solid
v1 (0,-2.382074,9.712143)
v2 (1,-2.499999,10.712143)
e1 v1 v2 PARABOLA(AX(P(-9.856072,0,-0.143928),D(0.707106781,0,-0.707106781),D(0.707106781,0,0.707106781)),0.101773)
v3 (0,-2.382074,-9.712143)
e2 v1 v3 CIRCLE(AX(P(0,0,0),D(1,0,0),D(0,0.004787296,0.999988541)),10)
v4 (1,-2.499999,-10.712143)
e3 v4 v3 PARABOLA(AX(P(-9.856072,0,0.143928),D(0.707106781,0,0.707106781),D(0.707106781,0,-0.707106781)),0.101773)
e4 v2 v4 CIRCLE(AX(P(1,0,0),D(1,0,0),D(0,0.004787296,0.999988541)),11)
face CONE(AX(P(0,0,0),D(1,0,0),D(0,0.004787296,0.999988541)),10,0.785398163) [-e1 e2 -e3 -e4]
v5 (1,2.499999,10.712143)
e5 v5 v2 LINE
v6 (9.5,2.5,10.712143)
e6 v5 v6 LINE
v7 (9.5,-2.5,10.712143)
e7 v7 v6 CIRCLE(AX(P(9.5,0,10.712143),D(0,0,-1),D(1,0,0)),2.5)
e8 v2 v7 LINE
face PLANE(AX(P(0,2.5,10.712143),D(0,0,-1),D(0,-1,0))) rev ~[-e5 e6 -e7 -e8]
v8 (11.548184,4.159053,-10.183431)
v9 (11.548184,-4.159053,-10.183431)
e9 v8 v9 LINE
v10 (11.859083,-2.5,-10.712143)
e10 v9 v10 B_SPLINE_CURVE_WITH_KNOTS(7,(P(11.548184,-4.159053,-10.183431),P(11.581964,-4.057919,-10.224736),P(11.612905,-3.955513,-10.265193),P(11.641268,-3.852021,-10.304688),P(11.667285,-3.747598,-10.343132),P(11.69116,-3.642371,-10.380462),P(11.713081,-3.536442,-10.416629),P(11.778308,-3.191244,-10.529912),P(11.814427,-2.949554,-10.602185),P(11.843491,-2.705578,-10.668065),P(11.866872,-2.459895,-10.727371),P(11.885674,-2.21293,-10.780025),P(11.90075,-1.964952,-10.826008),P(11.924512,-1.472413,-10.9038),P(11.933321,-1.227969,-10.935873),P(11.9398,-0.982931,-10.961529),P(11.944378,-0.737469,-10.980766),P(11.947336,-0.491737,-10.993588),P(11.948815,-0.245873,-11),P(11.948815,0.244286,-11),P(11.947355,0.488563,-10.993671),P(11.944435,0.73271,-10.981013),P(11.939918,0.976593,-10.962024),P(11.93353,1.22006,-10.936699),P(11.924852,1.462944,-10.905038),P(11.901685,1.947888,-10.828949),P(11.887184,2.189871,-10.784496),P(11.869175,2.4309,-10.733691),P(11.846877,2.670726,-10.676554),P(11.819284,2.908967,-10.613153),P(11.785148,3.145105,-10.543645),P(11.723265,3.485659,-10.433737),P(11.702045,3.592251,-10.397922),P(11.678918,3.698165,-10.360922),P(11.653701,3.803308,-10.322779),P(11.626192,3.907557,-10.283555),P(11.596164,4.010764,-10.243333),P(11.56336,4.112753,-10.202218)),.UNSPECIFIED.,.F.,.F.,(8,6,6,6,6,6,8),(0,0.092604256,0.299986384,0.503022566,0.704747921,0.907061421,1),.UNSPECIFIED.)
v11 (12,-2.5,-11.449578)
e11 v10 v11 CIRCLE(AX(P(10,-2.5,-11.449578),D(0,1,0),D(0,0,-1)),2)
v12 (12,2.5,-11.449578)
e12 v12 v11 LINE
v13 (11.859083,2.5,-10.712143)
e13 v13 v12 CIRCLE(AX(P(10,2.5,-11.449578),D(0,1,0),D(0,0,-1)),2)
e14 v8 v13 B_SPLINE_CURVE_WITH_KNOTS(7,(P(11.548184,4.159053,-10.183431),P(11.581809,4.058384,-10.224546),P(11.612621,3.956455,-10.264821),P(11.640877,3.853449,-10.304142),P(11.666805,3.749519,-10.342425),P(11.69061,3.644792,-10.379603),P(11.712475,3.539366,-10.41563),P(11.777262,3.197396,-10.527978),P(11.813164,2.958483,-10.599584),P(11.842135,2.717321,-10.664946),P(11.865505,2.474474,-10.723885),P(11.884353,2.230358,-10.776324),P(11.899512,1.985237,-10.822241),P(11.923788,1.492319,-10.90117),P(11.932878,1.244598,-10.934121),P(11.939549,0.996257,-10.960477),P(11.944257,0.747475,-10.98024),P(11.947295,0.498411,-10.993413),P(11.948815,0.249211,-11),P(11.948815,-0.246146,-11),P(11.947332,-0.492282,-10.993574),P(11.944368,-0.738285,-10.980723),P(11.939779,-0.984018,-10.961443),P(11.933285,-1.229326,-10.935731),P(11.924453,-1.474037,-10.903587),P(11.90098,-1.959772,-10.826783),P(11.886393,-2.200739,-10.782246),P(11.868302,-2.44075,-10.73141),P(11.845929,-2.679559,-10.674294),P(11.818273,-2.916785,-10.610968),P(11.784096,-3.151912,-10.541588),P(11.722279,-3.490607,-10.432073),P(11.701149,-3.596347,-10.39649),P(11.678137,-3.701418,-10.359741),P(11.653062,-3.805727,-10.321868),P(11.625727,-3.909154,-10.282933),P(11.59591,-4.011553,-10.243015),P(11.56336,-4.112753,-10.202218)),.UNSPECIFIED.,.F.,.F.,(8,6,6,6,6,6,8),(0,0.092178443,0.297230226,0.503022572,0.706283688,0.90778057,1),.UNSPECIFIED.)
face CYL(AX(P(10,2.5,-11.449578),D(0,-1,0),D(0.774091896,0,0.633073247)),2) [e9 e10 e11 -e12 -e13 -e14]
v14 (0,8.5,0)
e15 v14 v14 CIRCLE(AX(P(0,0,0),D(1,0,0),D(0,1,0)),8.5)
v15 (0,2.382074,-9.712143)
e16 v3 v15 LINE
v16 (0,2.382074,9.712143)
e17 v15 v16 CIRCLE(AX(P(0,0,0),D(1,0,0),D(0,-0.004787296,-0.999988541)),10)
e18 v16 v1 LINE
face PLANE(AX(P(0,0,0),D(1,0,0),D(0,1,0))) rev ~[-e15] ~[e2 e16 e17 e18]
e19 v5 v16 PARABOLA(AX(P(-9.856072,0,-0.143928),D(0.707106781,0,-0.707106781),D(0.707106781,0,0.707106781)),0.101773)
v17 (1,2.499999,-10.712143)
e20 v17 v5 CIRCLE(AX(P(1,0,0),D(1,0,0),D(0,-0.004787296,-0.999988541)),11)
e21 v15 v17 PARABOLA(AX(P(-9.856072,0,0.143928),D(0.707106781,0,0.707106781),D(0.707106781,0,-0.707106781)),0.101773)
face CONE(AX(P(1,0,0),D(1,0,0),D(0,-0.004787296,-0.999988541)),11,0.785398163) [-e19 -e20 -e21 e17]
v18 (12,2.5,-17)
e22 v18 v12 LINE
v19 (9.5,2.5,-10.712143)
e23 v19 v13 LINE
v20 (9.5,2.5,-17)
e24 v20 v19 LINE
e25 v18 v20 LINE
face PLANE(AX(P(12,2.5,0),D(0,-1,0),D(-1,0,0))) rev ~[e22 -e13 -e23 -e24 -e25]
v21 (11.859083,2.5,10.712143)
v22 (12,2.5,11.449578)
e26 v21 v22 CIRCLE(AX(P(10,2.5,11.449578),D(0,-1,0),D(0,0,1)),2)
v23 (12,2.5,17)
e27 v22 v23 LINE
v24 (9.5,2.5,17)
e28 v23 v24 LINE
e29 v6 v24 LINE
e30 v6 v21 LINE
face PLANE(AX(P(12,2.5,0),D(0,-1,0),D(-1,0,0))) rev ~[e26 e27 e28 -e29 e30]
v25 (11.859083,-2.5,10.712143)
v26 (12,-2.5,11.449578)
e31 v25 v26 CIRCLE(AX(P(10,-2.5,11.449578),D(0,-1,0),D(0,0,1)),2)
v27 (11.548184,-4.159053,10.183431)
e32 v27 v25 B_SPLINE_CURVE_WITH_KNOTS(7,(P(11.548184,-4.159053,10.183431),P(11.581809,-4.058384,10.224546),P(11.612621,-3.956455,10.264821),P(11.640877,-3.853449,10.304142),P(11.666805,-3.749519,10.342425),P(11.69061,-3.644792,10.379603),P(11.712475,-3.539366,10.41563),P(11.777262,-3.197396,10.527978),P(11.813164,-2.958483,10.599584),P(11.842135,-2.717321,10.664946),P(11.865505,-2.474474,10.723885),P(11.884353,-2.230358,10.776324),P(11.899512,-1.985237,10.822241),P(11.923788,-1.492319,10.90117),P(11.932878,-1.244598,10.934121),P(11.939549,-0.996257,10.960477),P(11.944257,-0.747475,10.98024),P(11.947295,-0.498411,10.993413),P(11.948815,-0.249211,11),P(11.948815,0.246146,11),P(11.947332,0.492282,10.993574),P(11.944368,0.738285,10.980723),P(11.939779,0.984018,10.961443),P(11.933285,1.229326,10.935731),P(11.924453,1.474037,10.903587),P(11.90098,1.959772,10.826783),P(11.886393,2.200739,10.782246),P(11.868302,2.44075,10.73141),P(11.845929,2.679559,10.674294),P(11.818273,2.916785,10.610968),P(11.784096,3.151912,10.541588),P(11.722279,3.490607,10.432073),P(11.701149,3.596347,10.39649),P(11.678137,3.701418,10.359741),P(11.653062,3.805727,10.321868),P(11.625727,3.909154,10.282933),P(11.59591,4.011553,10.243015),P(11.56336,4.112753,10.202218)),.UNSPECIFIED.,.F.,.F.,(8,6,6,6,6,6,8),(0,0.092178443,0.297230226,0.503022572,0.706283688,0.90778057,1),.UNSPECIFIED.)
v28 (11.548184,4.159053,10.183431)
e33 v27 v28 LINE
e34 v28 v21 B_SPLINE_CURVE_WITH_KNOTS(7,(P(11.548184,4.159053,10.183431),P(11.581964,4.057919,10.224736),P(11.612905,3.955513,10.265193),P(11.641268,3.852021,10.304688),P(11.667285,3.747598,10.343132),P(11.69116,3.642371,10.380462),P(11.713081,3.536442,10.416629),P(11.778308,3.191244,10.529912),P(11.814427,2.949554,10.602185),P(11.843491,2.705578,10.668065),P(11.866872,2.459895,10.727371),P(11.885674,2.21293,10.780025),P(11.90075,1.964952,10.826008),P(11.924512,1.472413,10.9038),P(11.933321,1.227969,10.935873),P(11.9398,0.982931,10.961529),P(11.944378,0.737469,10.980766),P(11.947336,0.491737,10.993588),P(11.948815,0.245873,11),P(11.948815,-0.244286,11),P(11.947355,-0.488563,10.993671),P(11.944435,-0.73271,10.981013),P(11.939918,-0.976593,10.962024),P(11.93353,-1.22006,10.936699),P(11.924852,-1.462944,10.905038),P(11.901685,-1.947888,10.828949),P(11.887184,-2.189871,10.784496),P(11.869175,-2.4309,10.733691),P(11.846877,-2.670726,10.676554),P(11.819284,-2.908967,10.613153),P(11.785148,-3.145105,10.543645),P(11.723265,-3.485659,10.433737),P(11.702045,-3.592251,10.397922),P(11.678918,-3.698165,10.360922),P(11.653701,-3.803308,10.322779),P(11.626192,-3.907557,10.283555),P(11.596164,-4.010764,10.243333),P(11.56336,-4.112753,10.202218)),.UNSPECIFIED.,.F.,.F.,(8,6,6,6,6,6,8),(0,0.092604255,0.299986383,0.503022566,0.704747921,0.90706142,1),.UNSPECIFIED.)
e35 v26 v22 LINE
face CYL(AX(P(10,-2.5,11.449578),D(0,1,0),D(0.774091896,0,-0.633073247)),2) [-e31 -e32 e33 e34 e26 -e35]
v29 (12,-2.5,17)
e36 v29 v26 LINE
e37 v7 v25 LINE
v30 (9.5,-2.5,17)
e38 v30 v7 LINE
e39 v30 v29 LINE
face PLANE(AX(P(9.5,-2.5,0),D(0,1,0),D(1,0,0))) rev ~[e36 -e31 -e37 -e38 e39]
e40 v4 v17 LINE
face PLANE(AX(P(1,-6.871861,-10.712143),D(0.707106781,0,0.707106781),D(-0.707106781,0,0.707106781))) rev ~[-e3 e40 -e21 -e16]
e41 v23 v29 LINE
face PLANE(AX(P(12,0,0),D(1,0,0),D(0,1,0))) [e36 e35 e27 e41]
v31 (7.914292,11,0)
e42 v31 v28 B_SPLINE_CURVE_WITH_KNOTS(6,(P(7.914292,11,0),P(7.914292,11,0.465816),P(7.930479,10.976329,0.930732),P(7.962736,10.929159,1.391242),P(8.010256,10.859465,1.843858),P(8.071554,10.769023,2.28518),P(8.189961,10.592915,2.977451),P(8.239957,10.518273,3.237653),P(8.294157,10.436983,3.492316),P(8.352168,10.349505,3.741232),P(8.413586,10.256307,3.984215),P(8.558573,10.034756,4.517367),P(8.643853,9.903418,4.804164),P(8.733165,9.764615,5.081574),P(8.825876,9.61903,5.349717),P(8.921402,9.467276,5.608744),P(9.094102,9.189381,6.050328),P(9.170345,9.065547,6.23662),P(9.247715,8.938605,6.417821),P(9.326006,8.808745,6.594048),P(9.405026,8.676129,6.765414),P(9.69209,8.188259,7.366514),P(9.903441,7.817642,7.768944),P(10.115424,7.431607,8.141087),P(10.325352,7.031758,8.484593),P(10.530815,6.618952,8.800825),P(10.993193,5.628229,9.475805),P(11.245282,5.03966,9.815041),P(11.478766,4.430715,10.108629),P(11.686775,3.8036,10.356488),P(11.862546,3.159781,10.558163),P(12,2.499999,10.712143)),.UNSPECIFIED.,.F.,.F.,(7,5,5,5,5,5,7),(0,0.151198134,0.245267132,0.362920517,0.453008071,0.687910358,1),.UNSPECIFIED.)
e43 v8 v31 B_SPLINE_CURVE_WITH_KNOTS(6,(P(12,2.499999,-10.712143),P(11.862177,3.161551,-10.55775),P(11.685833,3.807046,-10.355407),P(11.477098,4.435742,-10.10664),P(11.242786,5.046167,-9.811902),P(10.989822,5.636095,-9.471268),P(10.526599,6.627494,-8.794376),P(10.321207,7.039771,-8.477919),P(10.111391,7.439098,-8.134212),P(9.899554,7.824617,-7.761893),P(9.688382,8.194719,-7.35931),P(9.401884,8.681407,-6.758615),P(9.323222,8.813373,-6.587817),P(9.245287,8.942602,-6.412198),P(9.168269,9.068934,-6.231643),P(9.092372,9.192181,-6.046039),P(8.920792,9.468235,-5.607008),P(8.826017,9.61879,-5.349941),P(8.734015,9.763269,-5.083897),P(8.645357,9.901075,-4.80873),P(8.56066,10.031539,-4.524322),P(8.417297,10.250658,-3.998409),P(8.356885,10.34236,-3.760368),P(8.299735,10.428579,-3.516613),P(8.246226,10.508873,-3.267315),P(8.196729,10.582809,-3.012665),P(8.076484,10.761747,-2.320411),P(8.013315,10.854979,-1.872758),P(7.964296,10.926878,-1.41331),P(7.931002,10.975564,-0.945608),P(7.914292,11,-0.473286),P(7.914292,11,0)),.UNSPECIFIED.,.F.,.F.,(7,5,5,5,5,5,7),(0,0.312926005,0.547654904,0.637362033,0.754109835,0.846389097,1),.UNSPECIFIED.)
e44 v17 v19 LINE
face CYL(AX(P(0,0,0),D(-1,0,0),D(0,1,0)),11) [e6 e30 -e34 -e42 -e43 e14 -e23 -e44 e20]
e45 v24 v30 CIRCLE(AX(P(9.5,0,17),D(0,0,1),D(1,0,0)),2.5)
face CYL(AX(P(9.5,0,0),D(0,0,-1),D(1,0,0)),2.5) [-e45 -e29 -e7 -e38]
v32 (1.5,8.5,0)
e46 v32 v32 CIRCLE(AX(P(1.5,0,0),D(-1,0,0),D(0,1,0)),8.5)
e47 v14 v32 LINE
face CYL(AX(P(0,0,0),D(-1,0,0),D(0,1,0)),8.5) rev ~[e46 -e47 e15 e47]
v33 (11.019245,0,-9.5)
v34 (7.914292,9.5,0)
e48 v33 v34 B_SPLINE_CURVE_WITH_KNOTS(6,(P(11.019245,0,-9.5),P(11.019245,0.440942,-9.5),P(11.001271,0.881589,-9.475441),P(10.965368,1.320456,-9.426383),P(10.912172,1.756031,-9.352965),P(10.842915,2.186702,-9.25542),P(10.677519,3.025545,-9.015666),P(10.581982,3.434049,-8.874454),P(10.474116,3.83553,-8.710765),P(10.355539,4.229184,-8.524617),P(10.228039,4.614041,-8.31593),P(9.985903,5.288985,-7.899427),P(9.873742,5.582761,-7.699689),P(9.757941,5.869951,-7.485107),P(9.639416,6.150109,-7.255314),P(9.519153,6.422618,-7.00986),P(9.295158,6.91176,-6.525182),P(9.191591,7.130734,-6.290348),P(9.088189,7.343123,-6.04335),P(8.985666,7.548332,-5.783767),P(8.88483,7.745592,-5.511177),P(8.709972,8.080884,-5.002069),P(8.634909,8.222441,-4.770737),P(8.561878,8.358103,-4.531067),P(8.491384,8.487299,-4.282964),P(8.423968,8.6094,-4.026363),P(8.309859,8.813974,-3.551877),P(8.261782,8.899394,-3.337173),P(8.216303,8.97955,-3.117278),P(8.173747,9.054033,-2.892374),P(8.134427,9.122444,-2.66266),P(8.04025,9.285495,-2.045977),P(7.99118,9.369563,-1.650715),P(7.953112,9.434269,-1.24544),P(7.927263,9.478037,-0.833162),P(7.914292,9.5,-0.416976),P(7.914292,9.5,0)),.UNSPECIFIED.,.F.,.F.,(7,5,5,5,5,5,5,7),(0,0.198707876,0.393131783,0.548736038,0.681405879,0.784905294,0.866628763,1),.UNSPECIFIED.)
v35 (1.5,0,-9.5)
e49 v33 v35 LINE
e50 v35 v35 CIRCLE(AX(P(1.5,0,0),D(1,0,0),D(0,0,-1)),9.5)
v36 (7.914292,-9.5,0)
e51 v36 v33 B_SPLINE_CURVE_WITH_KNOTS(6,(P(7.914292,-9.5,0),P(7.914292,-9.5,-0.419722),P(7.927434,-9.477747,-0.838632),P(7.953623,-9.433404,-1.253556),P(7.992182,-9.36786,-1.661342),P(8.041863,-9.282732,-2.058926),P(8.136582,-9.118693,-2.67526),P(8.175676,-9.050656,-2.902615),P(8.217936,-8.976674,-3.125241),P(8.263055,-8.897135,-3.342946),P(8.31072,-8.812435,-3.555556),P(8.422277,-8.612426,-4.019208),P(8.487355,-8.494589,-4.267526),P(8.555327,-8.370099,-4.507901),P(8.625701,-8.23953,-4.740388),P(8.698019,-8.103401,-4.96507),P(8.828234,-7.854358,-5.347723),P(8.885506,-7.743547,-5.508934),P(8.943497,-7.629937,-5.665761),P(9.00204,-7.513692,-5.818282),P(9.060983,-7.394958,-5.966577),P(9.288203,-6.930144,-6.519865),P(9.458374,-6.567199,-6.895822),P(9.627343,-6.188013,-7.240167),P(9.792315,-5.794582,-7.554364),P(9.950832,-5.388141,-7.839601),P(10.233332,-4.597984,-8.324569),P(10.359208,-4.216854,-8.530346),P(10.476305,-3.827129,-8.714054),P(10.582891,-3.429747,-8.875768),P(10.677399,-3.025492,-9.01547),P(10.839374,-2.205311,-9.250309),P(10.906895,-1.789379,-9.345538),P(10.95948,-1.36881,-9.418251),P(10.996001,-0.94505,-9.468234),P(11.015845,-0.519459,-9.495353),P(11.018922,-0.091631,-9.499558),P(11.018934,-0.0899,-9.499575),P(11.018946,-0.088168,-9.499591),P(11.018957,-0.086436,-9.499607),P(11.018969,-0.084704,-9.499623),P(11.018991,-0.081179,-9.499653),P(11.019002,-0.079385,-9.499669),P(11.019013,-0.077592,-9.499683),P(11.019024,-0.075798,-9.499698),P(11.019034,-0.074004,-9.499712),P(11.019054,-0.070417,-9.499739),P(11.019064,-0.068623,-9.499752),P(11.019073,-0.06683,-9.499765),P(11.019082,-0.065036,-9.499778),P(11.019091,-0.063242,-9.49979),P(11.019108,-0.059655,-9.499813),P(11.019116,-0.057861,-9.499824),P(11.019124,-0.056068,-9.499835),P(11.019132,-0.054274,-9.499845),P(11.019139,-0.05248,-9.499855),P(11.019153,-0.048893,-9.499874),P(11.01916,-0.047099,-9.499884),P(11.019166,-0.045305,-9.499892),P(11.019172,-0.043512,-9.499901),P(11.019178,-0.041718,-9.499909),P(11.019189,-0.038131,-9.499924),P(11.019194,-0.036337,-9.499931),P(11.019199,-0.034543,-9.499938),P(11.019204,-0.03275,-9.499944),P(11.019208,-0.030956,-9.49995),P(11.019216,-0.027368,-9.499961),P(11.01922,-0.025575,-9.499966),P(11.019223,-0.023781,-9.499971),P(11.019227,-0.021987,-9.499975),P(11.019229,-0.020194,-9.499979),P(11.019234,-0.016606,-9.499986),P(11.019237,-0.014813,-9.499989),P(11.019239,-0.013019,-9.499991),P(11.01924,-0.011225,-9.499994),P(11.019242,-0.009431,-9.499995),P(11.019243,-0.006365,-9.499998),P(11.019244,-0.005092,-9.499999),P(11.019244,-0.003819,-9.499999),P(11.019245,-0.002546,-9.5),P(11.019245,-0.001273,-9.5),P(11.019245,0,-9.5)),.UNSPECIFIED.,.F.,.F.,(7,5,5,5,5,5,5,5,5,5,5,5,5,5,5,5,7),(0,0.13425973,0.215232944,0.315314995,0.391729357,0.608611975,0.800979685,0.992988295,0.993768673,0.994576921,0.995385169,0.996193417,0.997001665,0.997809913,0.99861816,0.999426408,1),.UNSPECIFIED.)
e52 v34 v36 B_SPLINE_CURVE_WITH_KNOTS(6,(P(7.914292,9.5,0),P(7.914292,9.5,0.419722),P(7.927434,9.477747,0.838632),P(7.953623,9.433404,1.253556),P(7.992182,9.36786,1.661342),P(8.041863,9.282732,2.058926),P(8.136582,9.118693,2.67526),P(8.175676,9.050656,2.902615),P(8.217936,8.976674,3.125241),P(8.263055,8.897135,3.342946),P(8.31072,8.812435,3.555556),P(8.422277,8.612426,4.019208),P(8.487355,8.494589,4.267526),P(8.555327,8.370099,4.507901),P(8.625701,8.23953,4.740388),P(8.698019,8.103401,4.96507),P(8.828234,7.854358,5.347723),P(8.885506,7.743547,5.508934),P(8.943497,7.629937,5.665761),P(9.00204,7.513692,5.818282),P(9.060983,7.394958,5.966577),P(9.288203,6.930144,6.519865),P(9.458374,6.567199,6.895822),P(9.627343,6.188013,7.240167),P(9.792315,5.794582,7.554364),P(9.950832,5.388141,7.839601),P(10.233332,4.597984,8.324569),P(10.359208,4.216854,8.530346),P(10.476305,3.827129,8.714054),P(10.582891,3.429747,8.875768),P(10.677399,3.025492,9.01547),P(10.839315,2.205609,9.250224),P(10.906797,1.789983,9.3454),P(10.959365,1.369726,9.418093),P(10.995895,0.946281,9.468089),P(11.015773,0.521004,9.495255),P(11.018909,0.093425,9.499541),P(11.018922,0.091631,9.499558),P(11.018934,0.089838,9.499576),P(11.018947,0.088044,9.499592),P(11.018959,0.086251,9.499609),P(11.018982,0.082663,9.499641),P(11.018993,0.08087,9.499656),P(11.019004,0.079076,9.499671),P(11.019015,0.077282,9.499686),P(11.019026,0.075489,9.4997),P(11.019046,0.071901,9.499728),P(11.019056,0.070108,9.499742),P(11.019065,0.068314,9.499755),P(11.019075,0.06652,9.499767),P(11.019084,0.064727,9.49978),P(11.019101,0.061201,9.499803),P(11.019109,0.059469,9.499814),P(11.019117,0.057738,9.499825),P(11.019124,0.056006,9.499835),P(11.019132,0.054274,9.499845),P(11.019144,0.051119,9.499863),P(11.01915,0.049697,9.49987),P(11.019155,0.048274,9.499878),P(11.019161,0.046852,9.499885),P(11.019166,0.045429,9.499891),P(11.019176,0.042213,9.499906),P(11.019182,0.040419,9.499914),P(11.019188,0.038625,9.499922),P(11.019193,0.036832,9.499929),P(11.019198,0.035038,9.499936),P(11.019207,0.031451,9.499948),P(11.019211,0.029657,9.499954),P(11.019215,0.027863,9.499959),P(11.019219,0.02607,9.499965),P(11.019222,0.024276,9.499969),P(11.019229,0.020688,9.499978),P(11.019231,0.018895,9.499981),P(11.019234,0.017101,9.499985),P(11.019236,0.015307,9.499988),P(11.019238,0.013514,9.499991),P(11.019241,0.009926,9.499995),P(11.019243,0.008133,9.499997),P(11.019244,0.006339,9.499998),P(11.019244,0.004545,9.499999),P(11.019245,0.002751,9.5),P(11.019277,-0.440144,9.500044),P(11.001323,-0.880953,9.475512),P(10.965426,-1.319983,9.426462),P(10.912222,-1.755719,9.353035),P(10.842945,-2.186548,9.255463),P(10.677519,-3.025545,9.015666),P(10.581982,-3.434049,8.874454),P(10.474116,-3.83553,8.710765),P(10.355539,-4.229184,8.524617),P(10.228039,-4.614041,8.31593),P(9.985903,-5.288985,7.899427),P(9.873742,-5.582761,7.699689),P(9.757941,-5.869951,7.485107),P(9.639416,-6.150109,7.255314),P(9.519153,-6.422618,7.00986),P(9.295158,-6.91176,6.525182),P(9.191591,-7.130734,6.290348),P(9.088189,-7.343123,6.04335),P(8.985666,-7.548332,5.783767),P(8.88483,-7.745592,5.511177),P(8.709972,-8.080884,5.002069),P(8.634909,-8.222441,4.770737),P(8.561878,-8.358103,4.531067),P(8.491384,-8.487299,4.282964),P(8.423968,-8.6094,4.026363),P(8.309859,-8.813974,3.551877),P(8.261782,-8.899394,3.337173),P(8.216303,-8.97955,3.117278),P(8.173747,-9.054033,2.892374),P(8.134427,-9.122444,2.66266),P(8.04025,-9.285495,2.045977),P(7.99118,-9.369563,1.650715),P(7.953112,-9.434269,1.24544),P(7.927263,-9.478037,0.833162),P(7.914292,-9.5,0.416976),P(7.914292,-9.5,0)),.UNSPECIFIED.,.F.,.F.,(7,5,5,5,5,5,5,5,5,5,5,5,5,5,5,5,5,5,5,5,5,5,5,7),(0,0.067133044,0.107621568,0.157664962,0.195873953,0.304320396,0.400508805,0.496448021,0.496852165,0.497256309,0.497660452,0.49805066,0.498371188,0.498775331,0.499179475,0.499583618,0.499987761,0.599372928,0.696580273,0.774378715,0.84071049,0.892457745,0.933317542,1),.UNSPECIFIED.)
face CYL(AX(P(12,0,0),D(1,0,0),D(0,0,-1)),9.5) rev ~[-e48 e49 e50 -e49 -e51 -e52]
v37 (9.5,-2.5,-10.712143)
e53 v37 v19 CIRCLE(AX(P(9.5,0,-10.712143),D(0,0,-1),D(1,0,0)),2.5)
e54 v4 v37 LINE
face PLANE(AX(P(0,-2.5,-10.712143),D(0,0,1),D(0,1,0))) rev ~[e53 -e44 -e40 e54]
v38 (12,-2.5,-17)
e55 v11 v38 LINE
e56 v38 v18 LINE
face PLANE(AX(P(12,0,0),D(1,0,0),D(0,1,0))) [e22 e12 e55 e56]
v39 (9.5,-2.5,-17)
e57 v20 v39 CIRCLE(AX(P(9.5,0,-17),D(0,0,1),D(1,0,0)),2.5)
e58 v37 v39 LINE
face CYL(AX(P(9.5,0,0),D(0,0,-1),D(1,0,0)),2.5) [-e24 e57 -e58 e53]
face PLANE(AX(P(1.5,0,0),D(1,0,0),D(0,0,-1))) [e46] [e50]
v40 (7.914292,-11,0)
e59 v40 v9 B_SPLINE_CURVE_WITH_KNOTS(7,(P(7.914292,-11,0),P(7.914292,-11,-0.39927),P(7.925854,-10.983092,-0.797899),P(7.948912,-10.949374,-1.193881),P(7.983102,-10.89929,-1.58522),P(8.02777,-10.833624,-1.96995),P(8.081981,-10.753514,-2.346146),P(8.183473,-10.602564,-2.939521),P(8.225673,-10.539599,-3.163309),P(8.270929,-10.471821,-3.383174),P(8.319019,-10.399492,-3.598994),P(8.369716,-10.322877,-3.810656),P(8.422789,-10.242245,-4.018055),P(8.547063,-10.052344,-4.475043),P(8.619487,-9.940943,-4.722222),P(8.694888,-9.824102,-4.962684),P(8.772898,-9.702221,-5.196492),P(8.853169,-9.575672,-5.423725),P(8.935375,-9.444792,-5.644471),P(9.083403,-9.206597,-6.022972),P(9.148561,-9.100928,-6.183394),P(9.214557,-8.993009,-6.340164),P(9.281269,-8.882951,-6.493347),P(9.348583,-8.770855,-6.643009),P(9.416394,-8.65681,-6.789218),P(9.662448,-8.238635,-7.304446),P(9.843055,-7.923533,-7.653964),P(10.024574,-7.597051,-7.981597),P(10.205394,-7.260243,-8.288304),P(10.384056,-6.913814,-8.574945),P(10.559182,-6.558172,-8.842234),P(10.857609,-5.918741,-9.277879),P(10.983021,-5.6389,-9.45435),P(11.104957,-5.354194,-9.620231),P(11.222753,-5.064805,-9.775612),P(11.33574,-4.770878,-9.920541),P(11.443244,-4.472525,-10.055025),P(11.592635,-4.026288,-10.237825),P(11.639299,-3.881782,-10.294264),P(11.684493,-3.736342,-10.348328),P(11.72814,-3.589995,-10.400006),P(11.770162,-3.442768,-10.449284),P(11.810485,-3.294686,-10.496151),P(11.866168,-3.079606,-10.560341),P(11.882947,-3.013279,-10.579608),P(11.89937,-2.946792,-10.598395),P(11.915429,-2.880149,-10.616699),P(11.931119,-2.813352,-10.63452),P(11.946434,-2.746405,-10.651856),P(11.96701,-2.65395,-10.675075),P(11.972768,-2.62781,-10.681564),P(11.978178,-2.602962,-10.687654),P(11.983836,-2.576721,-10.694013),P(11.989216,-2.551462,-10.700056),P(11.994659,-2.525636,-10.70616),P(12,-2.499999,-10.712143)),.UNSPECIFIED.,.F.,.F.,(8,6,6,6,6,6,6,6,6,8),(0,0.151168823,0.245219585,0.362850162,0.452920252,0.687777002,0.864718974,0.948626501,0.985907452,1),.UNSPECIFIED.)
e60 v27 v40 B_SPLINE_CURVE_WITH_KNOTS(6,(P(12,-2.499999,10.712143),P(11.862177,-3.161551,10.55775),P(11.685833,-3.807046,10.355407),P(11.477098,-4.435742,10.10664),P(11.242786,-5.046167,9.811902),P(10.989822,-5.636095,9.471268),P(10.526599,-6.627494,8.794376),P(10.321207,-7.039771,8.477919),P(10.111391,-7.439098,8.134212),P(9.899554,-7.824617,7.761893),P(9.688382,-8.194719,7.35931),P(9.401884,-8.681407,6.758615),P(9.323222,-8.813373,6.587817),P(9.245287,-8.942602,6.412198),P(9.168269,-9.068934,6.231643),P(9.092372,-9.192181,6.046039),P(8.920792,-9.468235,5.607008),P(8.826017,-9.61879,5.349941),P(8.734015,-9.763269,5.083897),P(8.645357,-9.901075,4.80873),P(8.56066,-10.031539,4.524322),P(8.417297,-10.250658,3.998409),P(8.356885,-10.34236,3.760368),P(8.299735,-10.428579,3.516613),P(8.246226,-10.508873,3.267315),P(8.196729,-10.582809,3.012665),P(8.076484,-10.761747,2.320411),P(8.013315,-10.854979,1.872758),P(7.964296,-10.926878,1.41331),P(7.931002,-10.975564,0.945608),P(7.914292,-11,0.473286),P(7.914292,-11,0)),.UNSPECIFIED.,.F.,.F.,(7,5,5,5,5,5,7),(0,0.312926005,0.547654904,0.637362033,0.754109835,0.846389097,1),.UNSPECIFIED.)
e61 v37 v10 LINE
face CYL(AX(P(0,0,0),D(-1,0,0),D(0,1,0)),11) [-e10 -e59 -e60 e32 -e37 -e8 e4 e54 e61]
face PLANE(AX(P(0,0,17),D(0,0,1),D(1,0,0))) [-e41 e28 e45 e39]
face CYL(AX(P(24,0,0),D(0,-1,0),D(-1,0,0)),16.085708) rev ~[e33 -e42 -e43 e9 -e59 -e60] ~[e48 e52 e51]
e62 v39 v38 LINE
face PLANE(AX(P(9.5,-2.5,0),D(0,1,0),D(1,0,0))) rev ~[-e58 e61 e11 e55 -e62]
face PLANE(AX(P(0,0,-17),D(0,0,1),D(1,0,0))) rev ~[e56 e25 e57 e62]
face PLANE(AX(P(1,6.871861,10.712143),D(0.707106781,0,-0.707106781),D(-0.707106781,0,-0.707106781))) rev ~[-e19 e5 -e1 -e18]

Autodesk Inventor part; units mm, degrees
ref_plane "YZ Plane" through (0, 0, 0) normal (1, 0, 0) x (0, 1, 0)
ref_plane "XZ Plane" through (0, 0, 0) normal (0, 1, 0) x (-1, 0, 0)
ref_plane "XY Plane" through (0, 0, 0) normal (0, 0, 1) x (1, 0, 0)
sketch "Sketch1" plane through (0, 0, 0) normal (1, 0, 0) x (0, 1, 0)
  circle A0 centre (0, 0) radius 11
  circle A1 centre (0, 0) radius 8.5
  line L0 (2.5, 10.712143) -> (-2.5, 10.712143)
  line L1 (-2.5, 10.712143) -> (-2.5, -10.712143)
  line L2 (-2.5, -10.712143) -> (2.5, -10.712143)
  line L3 (2.5, -10.712143) -> (2.5, 10.712143)
  line L4 (2.5, 10.712143) -> (-2.5, -10.712143) construction
  line L5 (-2.5, 10.712143) -> (2.5, -10.712143) construction
  dimension "d0" = 22
  dimension "d3" = 17
  dimension "d18" = 5
extrude "Extrusion1" add sketch "Sketch1" along normal blind 12 contours A0 L3 A1 | L3 A1 L1 L0 | L2 L1 A1 L3 | L1 A1 A0
sketch "Sketch2" plane through (0, 0, 0) normal (0, 0, 1) x (1, 0, 0)
  line L0 (14.5, 2.5) -> (9.5, 2.5)
  line L1 (9.5, 2.5) -> (9.5, -2.5)
  line L2 (9.5, -2.5) -> (14.5, -2.5)
  line L3 (14.5, -2.5) -> (14.5, 2.5)
  line L4 (14.5, 2.5) -> (9.5, -2.5) construction
  line L5 (9.5, 2.5) -> (14.5, -2.5) construction
  circle A0 centre (9.5, 0) radius 2.5
  line L6 (12, -2.5) -> (12, 2.5) projected
  point P0 (0, 0)
  point P1 (9.5, 2.5)
  point P2 (12, 0)
  dimension "d4" = 5
  dimension "d5" = 5
extrude "Extrusion2" add sketch "Sketch2" along normal mid plane 34 contours L6 A0 L0 | A0 L1 | L1 A0 | L6 L2 A0
sketch "Sketch3" plane through (12, 0, 0) normal (1, 0, 0) x (0, 0, -1)
  circle A0 centre (0, 0) radius 9.5
  dimension "d8" = 19
extrude "Extrusion3" cut sketch "Sketch3" against normal blind 10.5
chamfer "Chamfer1" distance 1 angle 45 4 edges at (0, -11, 0) (0, 11, 0) (0, 0, -10.7121) (0, 0, 10.7121)
sketch "Sketch4" plane through (0, 0, 0) normal (0, 1, 0) x (-1, 0, 0)
  line L0 (-12, 10.712143) -> (-12, -10.712143)
  circle A0 centre (-24, 0) radius 16.085708
  line L1 (-12, 0) -> (-24, 0) construction
  point P0 (0, 0)
  point P1 (-12, 10.712143)
  dimension "d14" = 12
extrude "Extrusion4" cut sketch "Sketch4" along normal through all both and the other way through all contours A0 L0 picked at (-11.258553, -2.503733)
fillet "Fillet1" radius 2 2 edges at (12, 0, -10.7121) (12, 0, 10.7121)
properties part number "Cup" material "Aluminum 6061"
